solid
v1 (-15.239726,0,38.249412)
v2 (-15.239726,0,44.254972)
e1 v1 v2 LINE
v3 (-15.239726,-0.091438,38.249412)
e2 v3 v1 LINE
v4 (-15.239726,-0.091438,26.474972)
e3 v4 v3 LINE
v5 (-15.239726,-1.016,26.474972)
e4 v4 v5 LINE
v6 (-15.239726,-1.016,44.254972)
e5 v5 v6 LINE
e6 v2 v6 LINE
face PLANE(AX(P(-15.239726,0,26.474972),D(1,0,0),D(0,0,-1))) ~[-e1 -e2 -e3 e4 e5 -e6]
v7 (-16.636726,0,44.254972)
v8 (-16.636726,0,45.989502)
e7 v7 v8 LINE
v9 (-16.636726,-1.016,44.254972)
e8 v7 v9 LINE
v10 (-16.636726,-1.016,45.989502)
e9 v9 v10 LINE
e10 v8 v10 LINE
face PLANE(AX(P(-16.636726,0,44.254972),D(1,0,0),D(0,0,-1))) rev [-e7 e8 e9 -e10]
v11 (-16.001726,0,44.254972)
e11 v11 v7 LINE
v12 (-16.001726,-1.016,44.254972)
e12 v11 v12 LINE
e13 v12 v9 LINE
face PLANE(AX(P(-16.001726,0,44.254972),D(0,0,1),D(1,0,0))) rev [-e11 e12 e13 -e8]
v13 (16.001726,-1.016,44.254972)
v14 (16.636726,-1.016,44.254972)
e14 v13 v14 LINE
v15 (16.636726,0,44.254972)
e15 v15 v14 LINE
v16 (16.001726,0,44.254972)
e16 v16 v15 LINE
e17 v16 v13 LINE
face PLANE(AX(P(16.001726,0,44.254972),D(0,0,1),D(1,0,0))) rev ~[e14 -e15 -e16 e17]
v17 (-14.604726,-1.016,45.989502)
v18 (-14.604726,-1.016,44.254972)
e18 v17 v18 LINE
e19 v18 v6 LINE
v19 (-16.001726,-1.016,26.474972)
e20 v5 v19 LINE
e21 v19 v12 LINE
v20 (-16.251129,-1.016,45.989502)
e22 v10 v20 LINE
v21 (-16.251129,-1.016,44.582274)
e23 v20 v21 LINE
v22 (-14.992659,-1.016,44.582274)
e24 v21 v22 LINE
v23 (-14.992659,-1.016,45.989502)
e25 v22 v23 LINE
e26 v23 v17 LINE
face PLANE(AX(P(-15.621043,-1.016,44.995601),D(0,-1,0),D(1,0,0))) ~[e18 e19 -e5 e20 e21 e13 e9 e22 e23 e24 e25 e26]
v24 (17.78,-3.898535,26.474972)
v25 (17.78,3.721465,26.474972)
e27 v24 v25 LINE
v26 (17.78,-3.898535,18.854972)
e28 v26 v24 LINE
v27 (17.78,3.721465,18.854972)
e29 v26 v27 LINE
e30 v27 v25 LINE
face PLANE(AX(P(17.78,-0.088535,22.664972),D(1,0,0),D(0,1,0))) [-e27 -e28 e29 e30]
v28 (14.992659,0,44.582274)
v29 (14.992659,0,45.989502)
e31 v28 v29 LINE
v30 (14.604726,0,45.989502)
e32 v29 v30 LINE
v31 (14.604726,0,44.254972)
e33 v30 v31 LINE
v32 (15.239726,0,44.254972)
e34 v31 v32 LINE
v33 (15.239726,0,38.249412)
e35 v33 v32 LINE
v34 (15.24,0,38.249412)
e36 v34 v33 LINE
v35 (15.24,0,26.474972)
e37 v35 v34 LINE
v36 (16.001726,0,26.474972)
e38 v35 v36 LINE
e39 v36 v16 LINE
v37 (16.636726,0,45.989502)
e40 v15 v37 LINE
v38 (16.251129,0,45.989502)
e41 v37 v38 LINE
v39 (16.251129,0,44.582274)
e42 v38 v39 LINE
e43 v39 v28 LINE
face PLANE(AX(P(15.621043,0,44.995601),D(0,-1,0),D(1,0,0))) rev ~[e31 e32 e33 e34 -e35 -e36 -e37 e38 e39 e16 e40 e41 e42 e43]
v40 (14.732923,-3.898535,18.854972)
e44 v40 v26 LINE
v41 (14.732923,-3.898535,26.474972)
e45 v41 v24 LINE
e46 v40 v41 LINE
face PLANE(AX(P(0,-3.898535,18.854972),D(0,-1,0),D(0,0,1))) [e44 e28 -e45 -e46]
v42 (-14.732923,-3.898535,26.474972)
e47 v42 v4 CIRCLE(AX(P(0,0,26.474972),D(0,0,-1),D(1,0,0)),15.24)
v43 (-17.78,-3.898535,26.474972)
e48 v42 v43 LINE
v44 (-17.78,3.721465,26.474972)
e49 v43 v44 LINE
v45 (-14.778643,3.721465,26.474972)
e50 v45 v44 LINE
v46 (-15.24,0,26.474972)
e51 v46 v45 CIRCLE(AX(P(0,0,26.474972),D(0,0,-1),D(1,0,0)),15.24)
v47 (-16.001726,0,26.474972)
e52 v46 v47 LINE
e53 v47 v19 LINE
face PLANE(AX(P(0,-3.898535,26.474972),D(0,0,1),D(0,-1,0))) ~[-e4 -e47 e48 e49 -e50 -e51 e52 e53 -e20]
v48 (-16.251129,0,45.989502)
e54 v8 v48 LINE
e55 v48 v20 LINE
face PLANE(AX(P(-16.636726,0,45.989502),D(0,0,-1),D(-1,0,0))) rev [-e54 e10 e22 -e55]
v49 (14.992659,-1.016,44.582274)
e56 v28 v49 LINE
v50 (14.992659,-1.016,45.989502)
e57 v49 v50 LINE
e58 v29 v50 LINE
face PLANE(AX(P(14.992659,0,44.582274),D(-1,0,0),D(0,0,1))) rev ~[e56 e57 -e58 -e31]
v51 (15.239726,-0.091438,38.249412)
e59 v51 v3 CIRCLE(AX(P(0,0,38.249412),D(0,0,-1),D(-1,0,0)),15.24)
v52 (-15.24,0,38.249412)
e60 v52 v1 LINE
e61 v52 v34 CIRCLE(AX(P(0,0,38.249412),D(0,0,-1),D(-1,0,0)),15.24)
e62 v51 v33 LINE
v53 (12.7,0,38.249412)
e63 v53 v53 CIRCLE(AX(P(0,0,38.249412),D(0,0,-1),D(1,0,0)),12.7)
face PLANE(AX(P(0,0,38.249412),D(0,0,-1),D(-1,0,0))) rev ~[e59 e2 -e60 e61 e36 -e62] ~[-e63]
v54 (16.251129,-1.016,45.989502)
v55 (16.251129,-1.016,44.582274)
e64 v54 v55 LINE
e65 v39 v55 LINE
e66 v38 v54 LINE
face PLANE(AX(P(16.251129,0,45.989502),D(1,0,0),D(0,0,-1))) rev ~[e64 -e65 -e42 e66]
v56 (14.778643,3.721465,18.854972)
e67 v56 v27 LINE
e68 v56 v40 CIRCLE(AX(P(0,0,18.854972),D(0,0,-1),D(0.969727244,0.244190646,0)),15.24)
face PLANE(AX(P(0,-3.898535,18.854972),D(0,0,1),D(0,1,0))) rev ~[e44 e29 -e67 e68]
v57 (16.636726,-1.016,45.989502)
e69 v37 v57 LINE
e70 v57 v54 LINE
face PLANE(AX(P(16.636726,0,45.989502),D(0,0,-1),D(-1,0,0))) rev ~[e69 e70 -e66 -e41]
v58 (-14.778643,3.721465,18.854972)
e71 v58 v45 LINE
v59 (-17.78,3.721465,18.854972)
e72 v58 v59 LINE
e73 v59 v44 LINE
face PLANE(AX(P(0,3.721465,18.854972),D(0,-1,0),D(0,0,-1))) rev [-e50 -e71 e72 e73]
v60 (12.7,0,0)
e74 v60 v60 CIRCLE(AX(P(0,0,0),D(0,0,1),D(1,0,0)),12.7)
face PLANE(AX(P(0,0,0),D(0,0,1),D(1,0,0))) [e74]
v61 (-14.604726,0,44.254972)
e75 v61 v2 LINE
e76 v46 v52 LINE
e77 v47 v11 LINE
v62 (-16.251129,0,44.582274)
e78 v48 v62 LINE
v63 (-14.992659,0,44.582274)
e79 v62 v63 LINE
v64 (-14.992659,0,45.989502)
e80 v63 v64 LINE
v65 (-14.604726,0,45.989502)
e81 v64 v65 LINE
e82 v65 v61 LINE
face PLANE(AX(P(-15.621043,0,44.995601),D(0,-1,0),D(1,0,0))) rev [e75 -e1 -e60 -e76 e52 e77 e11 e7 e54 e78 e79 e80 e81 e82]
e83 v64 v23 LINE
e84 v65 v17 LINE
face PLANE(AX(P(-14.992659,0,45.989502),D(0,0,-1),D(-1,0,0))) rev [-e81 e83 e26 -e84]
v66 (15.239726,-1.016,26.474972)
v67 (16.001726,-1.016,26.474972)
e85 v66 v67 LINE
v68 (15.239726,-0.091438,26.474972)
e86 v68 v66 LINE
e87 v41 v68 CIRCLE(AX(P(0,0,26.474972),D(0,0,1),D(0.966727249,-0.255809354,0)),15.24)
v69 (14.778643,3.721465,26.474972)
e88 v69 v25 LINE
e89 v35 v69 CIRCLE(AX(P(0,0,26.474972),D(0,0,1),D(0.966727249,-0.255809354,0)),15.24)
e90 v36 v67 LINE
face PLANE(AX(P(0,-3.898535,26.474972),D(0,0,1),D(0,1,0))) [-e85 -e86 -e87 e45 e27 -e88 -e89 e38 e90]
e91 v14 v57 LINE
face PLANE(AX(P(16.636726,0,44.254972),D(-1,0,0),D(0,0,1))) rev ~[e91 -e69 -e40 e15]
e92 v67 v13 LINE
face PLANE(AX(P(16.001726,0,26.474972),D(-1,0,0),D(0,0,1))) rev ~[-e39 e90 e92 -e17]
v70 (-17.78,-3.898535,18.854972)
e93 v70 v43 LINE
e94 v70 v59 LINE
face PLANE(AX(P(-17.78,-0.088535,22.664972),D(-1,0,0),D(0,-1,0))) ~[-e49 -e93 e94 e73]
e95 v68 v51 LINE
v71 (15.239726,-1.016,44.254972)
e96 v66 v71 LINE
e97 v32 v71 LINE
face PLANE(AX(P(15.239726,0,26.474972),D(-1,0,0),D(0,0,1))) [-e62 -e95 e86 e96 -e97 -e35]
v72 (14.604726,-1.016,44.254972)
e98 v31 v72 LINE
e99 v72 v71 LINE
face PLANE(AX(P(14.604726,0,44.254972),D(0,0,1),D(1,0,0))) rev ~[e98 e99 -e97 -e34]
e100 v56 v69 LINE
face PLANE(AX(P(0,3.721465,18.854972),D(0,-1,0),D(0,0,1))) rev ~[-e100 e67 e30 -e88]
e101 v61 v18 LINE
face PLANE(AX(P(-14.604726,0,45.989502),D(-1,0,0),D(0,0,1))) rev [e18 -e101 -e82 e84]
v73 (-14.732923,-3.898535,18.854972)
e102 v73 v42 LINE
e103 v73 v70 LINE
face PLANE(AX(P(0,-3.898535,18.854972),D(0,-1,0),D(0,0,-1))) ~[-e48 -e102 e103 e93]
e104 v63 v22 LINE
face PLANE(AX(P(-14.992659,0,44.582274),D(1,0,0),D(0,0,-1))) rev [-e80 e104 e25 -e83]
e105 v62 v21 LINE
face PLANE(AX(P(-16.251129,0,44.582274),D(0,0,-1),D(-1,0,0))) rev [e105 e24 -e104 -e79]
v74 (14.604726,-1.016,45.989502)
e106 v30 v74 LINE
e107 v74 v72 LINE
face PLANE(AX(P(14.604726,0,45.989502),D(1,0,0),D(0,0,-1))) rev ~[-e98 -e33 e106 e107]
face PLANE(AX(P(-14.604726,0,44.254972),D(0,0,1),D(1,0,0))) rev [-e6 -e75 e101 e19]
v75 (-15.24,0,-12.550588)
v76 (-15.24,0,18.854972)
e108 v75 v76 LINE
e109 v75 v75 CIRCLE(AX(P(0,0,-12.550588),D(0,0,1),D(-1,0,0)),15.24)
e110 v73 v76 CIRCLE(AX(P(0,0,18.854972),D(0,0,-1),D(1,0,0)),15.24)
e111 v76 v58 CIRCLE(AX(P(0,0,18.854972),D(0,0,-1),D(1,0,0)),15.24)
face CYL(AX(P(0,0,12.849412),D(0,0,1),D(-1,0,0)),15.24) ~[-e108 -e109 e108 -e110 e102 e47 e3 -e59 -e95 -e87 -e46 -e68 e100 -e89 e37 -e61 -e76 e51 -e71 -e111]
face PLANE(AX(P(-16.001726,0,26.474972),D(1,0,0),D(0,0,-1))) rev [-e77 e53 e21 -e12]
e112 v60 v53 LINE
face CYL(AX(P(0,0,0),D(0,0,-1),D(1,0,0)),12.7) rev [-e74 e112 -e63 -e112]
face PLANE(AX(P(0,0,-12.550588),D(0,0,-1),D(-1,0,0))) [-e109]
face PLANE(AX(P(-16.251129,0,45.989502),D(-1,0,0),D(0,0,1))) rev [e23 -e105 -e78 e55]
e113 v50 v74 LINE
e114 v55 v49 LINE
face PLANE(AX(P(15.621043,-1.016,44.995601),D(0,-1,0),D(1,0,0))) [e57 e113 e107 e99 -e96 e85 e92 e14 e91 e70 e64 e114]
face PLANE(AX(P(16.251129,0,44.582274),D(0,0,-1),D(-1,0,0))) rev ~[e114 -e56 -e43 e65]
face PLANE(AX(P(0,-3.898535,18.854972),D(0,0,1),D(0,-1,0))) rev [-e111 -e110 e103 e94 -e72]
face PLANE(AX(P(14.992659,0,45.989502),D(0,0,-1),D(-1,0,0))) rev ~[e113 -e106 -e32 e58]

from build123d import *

# Parameters (mm, degrees)
F0_W     = 15.24
F0_H     = 50.8
F2_W     = 7.62
F2_H     = 7.62
F3_DEPTH = 17.78
F5_W     = 0.762
F5_H     = 17.78
F6_DEPTH = 1.016
F8_R     = 12.7
F9_DEPTH = 51.562


# Not quite as in the source:
# - a feature names something its author has since deleted; it is built from what else it names


with BuildPart() as f1:
    # F0 (on Front) → F1 (revolve)
    with BuildSketch(Plane.XZ):
        with Locations((-7.62, 12.8494124473)):
            Rectangle(F0_W, F0_H)
    revolve(axis=Axis((0, 0, 12.8494124473), (0, 0, -1)))

    # F2 (on Right) → F3 (join)
    with BuildSketch(Plane.YZ):
        with Locations((-0.0885345507, 22.6649723111)):
            Rectangle(F2_W, F2_H)
    extrude(amount=F3_DEPTH)

    # F4: F1 across plane


with BuildPart() as f1_1:
    add(f1.part)
    add(f1.part.mirror(Plane.YZ))

    # F5 (on Front) → F6 (join)
    with BuildSketch(Plane.XZ):
        Polygon((15.2397256883, 44.2549723111), (16.0017256883, 44.2549723111), (16.6367256883, 44.2549723111), (16.6367256883, 45.9895022213), (16.2511286259, 45.9895022213), (16.2511286259, 44.5822738111), (14.9926585078, 44.5822738111), (14.9926585078, 45.9895022213), (14.6047256883, 45.9895022213), (14.6047256883, 44.2549723111), align=None)
        with Locations((15.6207256883, 35.3649723111)):
            Rectangle(F5_W, F5_H)
    extrude(amount=F6_DEPTH)

    # F7: F1 across plane


with BuildPart() as f1_2:
    add(f1_1.part)
    add(f1_1.part.mirror(Plane.YZ))

    # F8 (on Top) → F9 (cut)
    with BuildSketch(Plane.XY):
        Circle(F8_R)
    extrude(amount=F9_DEPTH, mode=Mode.SUBTRACT)


solid = f1_2.part
